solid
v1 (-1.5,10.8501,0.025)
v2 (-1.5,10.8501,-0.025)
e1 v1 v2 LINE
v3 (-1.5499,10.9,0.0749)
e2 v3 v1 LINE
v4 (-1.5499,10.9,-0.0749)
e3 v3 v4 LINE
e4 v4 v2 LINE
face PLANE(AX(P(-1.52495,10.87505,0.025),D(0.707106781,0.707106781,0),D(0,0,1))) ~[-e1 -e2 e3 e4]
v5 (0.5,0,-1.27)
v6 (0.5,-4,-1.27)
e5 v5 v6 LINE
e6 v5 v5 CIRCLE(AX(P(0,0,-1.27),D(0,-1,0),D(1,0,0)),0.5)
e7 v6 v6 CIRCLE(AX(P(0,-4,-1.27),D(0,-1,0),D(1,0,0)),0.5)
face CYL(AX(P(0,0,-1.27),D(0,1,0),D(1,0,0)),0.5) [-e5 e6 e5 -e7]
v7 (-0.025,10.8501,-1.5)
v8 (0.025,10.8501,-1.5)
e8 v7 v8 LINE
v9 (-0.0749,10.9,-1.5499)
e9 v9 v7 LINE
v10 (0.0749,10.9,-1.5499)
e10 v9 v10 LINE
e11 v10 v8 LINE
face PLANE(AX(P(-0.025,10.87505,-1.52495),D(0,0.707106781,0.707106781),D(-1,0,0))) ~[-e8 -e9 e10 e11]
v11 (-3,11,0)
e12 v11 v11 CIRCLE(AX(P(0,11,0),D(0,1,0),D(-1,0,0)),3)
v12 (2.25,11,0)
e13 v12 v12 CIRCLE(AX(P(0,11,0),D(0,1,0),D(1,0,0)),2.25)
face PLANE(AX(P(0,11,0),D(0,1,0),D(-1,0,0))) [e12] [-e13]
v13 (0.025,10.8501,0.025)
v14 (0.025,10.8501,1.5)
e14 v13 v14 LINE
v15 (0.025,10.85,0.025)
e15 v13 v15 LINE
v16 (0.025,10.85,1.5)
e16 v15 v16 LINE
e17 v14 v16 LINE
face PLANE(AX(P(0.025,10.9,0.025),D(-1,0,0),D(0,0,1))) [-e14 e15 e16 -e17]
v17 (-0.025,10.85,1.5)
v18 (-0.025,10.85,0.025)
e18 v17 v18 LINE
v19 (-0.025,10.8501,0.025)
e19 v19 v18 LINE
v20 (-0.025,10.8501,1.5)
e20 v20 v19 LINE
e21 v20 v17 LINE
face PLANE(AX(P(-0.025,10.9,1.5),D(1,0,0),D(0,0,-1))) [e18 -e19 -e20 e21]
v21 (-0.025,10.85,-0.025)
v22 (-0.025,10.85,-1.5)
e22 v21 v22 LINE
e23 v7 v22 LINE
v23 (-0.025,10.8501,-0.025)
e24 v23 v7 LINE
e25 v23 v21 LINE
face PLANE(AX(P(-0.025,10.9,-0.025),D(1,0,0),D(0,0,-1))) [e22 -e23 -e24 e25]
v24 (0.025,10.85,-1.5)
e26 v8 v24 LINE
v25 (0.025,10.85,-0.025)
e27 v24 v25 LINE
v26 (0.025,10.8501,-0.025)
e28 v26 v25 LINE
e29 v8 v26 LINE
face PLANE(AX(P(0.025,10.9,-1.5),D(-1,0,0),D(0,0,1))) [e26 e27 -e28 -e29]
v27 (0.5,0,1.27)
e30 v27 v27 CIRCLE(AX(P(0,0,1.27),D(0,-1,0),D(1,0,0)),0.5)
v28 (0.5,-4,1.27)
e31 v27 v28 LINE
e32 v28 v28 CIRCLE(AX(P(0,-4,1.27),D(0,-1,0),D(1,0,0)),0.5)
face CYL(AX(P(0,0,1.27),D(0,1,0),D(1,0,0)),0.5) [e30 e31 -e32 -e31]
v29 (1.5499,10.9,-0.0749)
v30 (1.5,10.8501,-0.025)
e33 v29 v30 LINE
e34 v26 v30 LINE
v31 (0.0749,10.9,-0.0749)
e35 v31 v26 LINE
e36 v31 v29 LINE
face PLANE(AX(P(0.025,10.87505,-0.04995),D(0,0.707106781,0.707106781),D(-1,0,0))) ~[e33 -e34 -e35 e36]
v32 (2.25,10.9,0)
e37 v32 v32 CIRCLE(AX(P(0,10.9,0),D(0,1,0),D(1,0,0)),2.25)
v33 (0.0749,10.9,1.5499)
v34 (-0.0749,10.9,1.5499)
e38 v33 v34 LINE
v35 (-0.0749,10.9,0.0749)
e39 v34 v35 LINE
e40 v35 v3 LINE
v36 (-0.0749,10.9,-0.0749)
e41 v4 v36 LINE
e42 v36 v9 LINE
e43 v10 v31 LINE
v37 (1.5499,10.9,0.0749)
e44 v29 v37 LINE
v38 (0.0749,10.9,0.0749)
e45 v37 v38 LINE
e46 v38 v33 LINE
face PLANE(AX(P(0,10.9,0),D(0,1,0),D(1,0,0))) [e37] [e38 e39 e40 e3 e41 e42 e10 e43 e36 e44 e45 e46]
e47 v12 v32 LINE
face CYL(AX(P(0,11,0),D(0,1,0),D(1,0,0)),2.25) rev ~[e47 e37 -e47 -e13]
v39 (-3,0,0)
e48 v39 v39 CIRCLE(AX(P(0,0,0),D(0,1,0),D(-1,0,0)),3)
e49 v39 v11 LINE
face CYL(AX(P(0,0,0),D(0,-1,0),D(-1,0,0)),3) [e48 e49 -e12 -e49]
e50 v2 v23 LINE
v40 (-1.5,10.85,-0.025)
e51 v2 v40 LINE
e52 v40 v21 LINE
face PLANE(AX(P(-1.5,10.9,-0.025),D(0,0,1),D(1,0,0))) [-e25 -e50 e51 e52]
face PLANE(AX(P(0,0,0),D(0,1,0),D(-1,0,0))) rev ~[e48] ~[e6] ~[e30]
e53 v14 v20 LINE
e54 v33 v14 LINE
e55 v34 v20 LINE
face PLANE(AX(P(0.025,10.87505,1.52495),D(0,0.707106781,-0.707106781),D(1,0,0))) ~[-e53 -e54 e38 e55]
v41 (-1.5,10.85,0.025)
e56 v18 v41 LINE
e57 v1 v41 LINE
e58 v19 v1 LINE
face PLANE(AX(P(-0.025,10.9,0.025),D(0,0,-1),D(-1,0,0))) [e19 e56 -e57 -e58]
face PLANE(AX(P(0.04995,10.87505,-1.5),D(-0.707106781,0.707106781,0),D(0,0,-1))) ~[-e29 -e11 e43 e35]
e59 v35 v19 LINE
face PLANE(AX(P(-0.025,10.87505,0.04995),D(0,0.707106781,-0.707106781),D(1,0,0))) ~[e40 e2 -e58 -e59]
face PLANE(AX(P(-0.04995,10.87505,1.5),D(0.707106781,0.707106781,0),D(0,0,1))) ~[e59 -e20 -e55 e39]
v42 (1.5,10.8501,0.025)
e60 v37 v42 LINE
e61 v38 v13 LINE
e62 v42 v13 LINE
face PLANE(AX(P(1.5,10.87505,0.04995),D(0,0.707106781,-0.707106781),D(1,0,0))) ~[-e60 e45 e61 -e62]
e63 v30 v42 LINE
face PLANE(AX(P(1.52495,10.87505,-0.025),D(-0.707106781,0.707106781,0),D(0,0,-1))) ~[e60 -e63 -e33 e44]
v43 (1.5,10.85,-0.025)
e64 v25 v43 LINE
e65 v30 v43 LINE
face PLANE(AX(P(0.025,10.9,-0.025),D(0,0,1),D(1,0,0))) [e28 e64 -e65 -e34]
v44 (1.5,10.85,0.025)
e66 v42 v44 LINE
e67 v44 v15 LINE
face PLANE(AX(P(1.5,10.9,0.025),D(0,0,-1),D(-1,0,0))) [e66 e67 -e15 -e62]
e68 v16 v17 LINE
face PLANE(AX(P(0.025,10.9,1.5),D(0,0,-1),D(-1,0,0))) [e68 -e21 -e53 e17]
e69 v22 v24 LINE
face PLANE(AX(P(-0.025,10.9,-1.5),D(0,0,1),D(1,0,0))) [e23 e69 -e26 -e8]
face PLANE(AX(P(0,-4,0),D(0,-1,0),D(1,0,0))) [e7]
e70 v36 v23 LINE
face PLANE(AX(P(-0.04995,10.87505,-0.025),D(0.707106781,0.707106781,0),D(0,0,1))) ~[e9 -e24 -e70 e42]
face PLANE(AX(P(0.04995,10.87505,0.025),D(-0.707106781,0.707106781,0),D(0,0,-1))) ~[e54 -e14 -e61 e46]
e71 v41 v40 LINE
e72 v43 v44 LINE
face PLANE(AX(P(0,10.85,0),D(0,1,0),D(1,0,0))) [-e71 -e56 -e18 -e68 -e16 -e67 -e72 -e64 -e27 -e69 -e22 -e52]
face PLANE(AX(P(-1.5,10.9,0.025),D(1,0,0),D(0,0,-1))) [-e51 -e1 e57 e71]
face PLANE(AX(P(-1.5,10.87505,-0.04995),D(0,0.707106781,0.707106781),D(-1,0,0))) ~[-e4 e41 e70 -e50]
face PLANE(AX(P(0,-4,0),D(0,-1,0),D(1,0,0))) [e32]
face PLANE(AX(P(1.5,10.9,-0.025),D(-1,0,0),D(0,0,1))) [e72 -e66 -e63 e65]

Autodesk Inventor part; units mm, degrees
sketch "Skizze3" plane through (0, 0, 0) normal (0, 1, 0) x (-1, 0, 0)
  circle A0 centre (0, 0) radius 3
  dimension "Durchmesser" = 6
extrude "Extrusion2" add sketch "Skizze3" along normal blind 11
sketch "Skizze4" plane through (0, 0, 0) normal (0, -1, 0) x (1, 0, 0)
  circle A0 centre (0, 1.27) radius 0.5
  circle A1 centre (0, -1.27) radius 0.5
  point P0 (0, 0)
  dimension "d6" = 1
  dimension "d7" = 1
  dimension "BeinAbstand" = 2.54
  dimension "BeinZuMitte" = 1.27
extrude "Extrusion3" add sketch "Skizze4" along normal blind 4
ref_plane "Arbeitsebene1" through (-1.5, 0, 0) normal (1, 0, 0) x (0, 1, 0)
ref_plane "Arbeitsebene2" through (1.5, 0, 0) normal (1, 0, 0) x (0, 1, 0)
split_face "Trennen1"
split_face "Trennen2"
ref_plane "Arbeitsebene3" through (-0.5, 0, 0) normal (1, 0, 0) x (0, 1, 0)
ref_plane "Arbeitsebene4" through (0.5, 0, 0) normal (1, 0, 0) x (0, 1, 0)
ref_plane "Arbeitsebene5" through (0, 9, 0) normal (0, 1, 0) x (1, 0, 0)
ref_plane "Arbeitsebene6" through (0, 6.5, 0) normal (0, 1, 0) x (1, 0, 0)
sketch "Skizze5" plane through (0, 11, 0) normal (0, 1, 0) x (1, 0, 0)
  circle A0 centre (0, 0) radius 2.25
  dimension "d21" = 4.5
extrude "Extrusion4" cut sketch "Skizze5" against normal blind 0.1
split_face "Trennen3"
split_face "Trennen4"
split_face "Trennen7"
split_face "Trennen8"
ref_plane "Arbeitsebene9" through (0, 3.5, 0) normal (0, -1, 0) x (1, 0, 0)
ref_plane "Arbeitsebene10" through (0, 1, 0) normal (0, -1, 0) x (1, 0, 0)
split_face "Trennen9"
split_face "Trennen10"
sketch "Skizze6" plane through (0, 10.9, 0) normal (0, 1, 0) x (1, 0, 0)
  line L0 (1.5, -0.025) -> (0, -0.025)
  line L1 (0, -0.025) -> (0, 0.025)
  line L2 (0, 0.025) -> (1.5, 0.025)
  line L3 (1.5, 0.025) -> (1.5, -0.025)
  line L4 (0.025, 1.5) -> (0.025, 0)
  line L5 (-0.025, 0) -> (-0.025, 1.5)
  line L6 (0.025, 0) -> (-0.025, 0)
  line L7 (-0.025, 1.5) -> (0.025, 1.5)
  line L8 (-1.5, 0.025) -> (0, 0.025)
  line L9 (0, -0.025) -> (-1.5, -0.025)
  line L10 (0, 0.025) -> (0, -0.025)
  line L11 (-1.5, -0.025) -> (-1.5, 0.025)
  line L12 (-0.025, -1.5) -> (-0.025, 0)
  line L13 (0.025, 0) -> (0.025, -1.5)
  line L14 (-0.025, 0) -> (0.025, 0)
  line L15 (0.025, -1.5) -> (-0.025, -1.5)
  point P0 (0, 0)
  point P1 (0, 0)
  point P2 (0, 0)
  point P3 (0, 0)
  dimension "d26" = 0.05
  dimension "d27" = 0.025
  dimension "d28" = 1.5
  dimension "d31" = 360
extrude "Extrusion5" cut sketch "Skizze6" against normal blind 0.05
chamfer "Fase1" distance 0.05 angle 45 12 edges at (-0.025, 10.9, 0.7625) (0, 10.9, 1.5) (0.025, 10.9, 0.7625) (-0.7625, 10.9, 0.025) (-0.7625, 10.9, -0.025) (-0.025, 10.9, -0.7625) (0.025, 10.9, -0.7625) (0.7625, 10.9, 0.025) (0.7625, 10.9, -0.025) (0, 10.9, -1.5) (-1.5, 10.9, 0) (1.5, 10.9, 0)
fillet_without_effect "Rundung1"
equation "\"BeinZuMitte\" = 0.5 * BeinAbstand"
properties part number "Kondensator"
